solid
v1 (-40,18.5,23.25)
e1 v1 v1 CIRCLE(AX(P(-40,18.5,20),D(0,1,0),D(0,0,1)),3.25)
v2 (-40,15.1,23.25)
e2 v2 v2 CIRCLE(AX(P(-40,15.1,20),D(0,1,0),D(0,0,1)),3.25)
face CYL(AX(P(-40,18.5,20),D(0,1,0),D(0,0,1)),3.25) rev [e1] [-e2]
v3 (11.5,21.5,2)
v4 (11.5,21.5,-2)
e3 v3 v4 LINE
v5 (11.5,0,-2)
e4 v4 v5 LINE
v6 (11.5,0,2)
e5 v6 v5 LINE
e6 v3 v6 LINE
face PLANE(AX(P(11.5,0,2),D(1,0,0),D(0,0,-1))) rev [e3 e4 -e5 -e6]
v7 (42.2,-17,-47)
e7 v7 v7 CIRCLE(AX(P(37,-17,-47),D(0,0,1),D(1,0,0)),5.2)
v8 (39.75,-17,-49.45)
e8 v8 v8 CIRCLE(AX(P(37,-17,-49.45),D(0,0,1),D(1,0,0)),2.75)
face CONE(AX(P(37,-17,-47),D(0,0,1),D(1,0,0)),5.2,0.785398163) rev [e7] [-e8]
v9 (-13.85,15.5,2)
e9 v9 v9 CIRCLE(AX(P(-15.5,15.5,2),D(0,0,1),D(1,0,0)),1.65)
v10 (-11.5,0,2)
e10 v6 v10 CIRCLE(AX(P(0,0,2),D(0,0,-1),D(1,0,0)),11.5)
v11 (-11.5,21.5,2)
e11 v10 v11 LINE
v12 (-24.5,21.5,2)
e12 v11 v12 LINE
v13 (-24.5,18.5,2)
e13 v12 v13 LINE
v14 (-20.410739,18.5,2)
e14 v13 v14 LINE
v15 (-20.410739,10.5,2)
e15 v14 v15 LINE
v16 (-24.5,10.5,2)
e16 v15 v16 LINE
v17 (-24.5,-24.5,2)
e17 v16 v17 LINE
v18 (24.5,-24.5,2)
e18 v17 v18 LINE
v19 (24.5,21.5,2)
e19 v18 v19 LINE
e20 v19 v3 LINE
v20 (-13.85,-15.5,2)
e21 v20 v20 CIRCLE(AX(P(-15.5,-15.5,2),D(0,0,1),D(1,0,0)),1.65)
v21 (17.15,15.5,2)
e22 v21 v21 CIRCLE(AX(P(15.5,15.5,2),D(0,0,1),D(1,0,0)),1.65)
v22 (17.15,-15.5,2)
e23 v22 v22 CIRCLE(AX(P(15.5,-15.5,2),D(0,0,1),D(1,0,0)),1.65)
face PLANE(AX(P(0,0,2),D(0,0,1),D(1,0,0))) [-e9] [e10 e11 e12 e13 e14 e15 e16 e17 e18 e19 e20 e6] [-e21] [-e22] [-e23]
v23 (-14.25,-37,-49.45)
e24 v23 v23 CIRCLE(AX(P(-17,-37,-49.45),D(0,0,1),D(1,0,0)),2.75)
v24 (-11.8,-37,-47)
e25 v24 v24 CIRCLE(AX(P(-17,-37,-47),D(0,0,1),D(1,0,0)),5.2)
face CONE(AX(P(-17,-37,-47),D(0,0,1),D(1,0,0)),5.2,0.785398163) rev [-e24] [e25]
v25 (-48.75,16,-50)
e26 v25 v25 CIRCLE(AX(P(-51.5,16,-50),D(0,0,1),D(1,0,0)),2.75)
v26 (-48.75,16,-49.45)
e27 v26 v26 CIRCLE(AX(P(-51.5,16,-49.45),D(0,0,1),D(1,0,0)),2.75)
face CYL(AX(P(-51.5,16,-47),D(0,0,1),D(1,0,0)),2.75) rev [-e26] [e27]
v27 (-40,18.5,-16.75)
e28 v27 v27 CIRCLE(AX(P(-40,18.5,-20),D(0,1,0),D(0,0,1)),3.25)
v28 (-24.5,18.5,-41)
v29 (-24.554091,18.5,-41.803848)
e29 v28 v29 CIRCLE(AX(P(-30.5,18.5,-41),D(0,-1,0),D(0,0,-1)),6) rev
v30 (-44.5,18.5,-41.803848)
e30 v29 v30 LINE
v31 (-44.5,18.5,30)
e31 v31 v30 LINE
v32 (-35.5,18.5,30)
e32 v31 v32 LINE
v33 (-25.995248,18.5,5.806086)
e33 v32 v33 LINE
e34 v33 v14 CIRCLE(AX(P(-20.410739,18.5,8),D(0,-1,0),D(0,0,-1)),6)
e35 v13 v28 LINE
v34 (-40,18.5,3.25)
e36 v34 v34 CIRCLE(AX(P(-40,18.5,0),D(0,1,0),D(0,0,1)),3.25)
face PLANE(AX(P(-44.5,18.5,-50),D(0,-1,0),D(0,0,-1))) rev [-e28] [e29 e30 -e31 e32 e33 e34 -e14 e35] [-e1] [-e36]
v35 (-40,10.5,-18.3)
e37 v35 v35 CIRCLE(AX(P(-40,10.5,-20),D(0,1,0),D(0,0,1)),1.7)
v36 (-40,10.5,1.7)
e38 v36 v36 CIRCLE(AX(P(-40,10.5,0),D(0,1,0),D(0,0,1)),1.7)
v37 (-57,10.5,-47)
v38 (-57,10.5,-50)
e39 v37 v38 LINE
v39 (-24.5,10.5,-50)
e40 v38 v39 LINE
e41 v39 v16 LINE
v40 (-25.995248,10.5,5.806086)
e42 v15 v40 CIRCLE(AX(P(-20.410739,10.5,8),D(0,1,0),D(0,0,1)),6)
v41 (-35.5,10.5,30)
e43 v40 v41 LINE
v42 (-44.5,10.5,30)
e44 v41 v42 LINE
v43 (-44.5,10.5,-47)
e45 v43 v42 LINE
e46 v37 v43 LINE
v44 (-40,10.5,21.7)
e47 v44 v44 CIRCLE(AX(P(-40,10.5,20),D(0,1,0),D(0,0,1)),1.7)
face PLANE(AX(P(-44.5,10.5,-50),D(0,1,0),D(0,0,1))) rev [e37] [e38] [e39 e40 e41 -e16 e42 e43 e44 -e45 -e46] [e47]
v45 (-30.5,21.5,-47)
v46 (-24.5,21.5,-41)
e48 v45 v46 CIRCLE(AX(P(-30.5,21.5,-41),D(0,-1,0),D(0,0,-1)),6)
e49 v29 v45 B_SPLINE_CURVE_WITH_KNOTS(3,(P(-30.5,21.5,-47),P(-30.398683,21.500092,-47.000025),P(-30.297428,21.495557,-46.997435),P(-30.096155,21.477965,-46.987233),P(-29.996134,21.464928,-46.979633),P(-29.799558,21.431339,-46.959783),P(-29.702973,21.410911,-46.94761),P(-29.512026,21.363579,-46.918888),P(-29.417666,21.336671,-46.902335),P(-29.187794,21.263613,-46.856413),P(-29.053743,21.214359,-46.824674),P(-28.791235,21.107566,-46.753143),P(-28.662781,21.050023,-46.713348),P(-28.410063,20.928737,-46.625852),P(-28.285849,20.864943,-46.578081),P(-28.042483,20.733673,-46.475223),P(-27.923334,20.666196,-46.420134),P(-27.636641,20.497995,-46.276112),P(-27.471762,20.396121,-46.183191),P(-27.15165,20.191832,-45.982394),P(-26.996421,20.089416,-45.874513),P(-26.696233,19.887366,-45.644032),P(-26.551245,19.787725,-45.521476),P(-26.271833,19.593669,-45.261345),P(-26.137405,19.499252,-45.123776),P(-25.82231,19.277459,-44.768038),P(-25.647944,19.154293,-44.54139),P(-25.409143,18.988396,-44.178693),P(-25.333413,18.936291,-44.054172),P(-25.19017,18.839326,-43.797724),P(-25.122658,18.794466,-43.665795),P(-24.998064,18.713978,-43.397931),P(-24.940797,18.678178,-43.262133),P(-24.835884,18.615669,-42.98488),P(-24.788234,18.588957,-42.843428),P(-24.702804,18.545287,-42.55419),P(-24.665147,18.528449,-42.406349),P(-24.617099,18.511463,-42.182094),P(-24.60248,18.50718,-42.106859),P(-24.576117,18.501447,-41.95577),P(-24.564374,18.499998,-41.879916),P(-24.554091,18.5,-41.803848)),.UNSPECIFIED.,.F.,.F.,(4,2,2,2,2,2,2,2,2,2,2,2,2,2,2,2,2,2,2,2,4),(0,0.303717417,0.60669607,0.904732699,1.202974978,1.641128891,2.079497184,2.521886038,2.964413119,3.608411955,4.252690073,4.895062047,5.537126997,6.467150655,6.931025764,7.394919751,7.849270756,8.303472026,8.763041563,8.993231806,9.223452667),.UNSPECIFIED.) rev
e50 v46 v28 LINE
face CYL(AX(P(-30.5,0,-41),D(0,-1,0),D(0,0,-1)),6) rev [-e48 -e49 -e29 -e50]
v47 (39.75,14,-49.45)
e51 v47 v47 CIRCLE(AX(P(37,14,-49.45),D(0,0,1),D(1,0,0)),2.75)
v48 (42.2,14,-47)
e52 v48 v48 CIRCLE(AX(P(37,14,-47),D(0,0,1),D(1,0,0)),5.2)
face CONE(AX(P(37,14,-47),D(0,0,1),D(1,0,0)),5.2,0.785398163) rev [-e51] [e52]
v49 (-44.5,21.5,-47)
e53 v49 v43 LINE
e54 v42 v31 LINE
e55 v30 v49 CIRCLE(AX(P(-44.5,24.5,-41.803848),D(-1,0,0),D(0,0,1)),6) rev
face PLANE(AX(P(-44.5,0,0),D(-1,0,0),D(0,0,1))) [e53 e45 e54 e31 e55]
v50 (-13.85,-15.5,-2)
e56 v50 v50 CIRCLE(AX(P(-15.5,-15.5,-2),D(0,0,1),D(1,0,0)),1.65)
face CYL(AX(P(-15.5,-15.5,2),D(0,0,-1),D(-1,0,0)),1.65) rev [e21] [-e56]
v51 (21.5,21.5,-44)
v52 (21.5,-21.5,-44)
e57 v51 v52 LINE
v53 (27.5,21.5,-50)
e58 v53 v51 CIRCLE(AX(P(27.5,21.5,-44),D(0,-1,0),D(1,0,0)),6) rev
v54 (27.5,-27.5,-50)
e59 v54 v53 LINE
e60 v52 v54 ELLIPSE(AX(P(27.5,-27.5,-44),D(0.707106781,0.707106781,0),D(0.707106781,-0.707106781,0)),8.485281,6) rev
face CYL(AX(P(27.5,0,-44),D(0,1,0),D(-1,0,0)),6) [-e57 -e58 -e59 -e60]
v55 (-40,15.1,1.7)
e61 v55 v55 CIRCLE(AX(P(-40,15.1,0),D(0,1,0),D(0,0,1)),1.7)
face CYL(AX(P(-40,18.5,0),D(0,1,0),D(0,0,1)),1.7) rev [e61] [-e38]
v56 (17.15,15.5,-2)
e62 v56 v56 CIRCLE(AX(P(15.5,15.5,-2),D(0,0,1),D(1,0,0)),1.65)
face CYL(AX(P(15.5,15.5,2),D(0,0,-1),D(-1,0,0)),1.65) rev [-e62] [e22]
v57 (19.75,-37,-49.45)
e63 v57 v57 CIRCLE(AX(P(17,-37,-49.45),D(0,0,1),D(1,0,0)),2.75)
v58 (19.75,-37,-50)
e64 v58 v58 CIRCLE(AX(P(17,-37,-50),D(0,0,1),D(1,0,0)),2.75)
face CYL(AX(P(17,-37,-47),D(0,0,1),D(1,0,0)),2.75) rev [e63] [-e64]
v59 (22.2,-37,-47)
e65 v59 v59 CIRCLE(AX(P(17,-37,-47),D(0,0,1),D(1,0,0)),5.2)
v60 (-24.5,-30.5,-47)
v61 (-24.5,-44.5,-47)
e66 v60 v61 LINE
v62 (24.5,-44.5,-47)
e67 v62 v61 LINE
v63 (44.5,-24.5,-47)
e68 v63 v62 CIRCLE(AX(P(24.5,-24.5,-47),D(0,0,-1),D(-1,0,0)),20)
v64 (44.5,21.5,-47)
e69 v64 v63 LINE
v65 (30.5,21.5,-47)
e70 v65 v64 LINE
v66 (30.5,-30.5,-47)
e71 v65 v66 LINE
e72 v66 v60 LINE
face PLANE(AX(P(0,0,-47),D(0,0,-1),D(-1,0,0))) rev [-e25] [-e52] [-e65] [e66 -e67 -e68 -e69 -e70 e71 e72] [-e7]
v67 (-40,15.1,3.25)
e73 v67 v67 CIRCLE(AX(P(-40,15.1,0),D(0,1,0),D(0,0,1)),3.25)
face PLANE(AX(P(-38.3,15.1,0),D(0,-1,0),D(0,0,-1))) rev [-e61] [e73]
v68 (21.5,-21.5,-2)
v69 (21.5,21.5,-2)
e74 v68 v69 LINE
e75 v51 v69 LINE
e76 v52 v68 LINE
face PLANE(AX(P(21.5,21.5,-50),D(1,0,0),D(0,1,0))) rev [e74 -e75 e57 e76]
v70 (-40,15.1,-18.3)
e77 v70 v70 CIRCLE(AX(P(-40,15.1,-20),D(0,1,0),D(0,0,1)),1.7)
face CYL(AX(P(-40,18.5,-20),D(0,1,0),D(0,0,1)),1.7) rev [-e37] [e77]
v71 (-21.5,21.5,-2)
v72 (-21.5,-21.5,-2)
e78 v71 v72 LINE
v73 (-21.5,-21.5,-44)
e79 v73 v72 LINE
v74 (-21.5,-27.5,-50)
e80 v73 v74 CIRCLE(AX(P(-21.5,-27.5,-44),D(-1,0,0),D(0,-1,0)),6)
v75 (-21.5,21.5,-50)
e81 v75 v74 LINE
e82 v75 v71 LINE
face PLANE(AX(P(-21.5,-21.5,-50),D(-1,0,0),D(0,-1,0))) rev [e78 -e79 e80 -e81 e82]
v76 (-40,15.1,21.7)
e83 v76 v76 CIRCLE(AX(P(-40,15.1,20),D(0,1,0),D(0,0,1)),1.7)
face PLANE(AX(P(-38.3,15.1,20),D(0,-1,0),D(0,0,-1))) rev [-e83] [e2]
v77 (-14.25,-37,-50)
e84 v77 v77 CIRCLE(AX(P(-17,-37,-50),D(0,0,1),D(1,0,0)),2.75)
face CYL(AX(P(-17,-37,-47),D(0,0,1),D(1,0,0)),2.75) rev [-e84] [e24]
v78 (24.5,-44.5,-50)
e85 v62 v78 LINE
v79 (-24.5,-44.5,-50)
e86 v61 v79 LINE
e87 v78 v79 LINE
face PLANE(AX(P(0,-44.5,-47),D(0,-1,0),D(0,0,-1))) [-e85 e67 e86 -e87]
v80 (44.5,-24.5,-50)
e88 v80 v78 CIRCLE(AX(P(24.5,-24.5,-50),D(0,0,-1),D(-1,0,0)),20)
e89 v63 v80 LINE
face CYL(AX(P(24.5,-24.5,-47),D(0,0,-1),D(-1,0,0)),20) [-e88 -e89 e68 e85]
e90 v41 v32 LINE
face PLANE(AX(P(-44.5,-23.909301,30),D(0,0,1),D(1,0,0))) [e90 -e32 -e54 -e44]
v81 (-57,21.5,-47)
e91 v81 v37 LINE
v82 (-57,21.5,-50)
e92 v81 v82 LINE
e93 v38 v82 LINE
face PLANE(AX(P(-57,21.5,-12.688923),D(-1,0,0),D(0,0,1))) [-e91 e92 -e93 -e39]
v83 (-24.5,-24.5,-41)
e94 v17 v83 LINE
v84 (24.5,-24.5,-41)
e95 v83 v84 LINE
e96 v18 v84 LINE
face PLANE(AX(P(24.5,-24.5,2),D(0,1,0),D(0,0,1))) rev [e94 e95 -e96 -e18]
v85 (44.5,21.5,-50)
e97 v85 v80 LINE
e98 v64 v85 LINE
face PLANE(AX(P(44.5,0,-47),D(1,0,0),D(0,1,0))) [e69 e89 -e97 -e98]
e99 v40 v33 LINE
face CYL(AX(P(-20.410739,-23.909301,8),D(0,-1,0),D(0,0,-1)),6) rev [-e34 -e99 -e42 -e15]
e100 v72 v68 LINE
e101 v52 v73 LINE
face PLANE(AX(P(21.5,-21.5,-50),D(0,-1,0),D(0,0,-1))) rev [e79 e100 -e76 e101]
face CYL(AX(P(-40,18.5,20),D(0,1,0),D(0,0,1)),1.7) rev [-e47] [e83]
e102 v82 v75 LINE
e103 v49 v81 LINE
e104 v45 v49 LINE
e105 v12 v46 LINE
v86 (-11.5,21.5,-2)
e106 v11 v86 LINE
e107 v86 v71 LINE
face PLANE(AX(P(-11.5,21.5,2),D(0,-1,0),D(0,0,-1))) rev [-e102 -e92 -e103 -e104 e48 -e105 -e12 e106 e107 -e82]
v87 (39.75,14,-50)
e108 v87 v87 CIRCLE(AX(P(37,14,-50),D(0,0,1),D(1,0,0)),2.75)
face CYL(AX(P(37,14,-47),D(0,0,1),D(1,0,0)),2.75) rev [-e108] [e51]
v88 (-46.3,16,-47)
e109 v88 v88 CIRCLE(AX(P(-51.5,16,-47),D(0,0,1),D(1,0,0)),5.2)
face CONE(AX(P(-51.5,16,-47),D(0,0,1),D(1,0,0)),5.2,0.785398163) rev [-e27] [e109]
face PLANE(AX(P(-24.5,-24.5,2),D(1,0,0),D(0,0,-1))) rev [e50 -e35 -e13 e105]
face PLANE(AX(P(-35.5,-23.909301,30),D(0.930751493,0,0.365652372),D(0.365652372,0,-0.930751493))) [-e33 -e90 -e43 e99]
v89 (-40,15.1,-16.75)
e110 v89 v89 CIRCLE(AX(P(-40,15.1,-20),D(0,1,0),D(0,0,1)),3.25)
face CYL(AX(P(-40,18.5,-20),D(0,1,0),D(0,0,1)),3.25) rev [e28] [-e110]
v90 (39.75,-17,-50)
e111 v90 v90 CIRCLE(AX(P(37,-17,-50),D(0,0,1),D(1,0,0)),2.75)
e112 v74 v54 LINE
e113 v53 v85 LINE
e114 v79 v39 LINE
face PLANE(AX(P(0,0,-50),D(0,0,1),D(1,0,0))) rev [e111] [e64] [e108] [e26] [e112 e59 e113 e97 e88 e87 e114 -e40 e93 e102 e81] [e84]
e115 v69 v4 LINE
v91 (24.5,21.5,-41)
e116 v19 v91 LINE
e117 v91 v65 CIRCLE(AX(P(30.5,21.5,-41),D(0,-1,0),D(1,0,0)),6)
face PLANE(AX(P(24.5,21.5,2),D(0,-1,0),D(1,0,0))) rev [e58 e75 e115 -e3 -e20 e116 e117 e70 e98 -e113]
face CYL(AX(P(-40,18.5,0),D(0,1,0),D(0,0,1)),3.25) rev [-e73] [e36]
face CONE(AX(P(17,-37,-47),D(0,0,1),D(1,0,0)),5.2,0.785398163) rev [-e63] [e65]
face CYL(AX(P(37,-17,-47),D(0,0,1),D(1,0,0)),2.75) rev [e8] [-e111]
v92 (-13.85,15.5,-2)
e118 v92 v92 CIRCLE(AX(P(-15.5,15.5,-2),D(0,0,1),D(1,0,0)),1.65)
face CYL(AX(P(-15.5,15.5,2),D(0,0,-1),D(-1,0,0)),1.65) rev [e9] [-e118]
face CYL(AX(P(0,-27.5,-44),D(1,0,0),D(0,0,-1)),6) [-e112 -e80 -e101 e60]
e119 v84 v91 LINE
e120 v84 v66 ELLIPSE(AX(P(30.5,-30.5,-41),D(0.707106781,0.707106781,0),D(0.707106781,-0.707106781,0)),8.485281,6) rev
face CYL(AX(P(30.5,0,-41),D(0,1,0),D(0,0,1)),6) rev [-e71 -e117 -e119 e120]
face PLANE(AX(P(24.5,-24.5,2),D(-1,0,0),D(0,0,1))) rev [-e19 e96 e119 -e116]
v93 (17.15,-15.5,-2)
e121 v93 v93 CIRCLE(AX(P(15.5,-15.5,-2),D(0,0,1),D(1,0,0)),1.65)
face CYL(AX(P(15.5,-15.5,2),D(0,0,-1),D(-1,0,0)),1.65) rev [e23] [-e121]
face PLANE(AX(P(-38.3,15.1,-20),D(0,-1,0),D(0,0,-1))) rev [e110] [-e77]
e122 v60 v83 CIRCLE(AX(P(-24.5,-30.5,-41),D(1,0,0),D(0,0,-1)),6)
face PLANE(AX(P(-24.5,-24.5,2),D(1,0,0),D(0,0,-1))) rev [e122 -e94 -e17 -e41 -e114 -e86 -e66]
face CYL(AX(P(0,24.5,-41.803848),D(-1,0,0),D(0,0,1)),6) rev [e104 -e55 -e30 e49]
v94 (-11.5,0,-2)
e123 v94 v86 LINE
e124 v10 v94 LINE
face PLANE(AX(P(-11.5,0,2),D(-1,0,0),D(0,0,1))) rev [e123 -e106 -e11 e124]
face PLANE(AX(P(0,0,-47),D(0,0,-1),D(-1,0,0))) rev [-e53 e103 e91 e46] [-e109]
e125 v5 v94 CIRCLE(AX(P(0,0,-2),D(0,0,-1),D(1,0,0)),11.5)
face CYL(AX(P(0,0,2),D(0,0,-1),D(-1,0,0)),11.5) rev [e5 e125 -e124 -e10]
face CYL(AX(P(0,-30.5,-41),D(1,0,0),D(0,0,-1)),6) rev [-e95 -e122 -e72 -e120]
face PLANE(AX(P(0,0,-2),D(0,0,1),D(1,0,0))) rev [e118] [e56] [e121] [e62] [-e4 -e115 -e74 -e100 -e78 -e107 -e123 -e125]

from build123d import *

# Parameters (mm, degrees)
ESQUISSE1_R                                       = 1.65
BOSS_EXTRU_1_DEPTH                                = 2
BOSS_EXTRU_2_DEPTH                                = 48
BOSS_EXTRU_3_DEPTH                                = 3
CONG_1_R                                          = 6
ESQUISSE6_W                                       = 52
ESQUISSE6_H                                       = 8
BOSS_EXTRU_4_DEPTH                                = 20
BOSS_EXTRU_5_DEPTH                                = 8
ESQUISSE8_W                                       = 32.5
ESQUISSE8_H                                       = 11
BOSS_EXTRU_7_DEPTH                                = 3
FRAISAGE_POUR_VIS_T_TE_FRAIS_E_M51_AT_COUNT       = 2
FRAISAGE_POUR_VIS_T_TE_FRAIS_E_M51_AT_PITCH       = 57.584720196
FRAISAGE_POUR_VIS_T_TE_FRAIS_E_M51_2_COUNT        = 2
FRAISAGE_POUR_VIS_T_TE_FRAIS_E_M51_2_PITCH        = 74.276510419
FRAISAGE_POUR_VIS_T_TE_FRAIS_E_M51_3_COUNT        = 2
FRAISAGE_POUR_VIS_T_TE_FRAIS_E_M51_3_PITCH        = 34
FRAISAGE_POUR_VIS_T_TE_FRAIS_E_M51_4_COUNT        = 2
FRAISAGE_POUR_VIS_T_TE_FRAIS_E_M51_4_PITCH        = 63.239623655
CONG_3_R                                          = 6
CONG_4_R                                          = 6
CHAMBRAGE_POUR_VIS_SIX_PANS_CREUX_M31_D           = 3.4
CHAMBRAGE_POUR_VIS_SIX_PANS_CREUX_M31_CBORE_D     = 6.5
CHAMBRAGE_POUR_VIS_SIX_PANS_CREUX_M31_CBORE_DEPTH = 3.4


with BuildPart() as part:
    # Esquisse1 → Boss.-Extru.1 (new, symmetric)
    with BuildSketch(Plane.XY):
        with BuildLine():
            Line((-11.5, 0), (-11.5, 21.5))
            Line((-11.5, 21.5), (-24.5, 21.5))
            Line((-24.5, 21.5), (-24.5, -24.5))
            Line((-24.5, -24.5), (24.5, -24.5))
            Line((24.5, -24.5), (24.5, 21.5))
            Line((24.5, 21.5), (11.5, 21.5))
            Line((11.5, 21.5), (11.5, 0))
            ThreePointArc((11.5, 0), (0, -11.5), (-11.5, 0))
        make_face()
        with Locations((-15.5, 15.5)):
            Circle(ESQUISSE1_R, mode=Mode.SUBTRACT)
        with Locations((15.5, 15.5)):
            Circle(ESQUISSE1_R, mode=Mode.SUBTRACT)
        with Locations((15.5, -15.5)):
            Circle(ESQUISSE1_R, mode=Mode.SUBTRACT)
        with Locations((-15.5, -15.5)):
            Circle(ESQUISSE1_R, mode=Mode.SUBTRACT)
    extrude(amount=BOSS_EXTRU_1_DEPTH, both=True)

    # Esquisse2 → Boss.-Extru.2 (add)
    with BuildSketch(Plane(origin=(0, 0, -2), x_dir=(-1, 0, 0), z_dir=(0, 0, -1))):
        Polygon((-24.5, 21.5), (-21.5, 21.5), (-21.5, -21.5), (21.5, -21.5), (21.5, 21.5), (24.5, 21.5), (24.5, -24.5), (-24.5, -24.5), align=None)
    extrude(amount=BOSS_EXTRU_2_DEPTH)

    # Esquisse4 → Boss.-Extru.3 (add)
    with BuildSketch(Plane(origin=(0, 0, -50), x_dir=(-1, 0, 0), z_dir=(0, 0, -1))):
        with BuildLine():
            Line((-24.5, 21.5), (-44.5, 21.5))
            Line((-44.5, 21.5), (-44.5, -24.5))
            ThreePointArc((-44.5, -24.5), (-38.642135624, -38.642135624), (-24.5, -44.5))
            Line((-24.5, -44.5), (24.5, -44.5))
            Line((24.5, -44.5), (24.5, -24.5))
            Line((24.5, -24.5), (-24.5, -24.5))
            Line((-24.5, -24.5), (-24.5, 21.5))
        make_face()
    extrude(amount=-BOSS_EXTRU_3_DEPTH)

    # Congé1
    cong_1_edges = [part.edges().sort_by_distance(p)[0] for p in [
        (0, -21.5, -50),
        (21.5, 0, -50),
        (24.5, -1.5, -47),
        (0, -24.5, -47),
    ]]
    fillet(cong_1_edges, radius=CONG_1_R)

    # Esquisse6 → Boss.-Extru.4 (add)
    with BuildSketch(Plane.ZY.offset(24.5)):
        with Locations((-24, 14.5)):
            Rectangle(ESQUISSE6_W, ESQUISSE6_H)
    extrude(amount=BOSS_EXTRU_4_DEPTH)

    # Esquisse7 → Boss.-Extru.5 (add)
    with BuildSketch(Plane(origin=(0, 18.5, 0), x_dir=(1, 0, 0), z_dir=(0, 1, 0))):
        Polygon((-44.5, -2), (-44.5, -30), (-35.5, -30), (-24.5, -2), align=None)
    extrude(amount=-BOSS_EXTRU_5_DEPTH)

    # Esquisse8 → Boss.-Extru.7 (add)
    with BuildSketch(Plane(origin=(0, 0, -50), x_dir=(-1, 0, 0), z_dir=(0, 0, -1))):
        with Locations((40.75, 16)):
            Rectangle(ESQUISSE8_W, ESQUISSE8_H)
    extrude(amount=-BOSS_EXTRU_7_DEPTH)

    # Esquisse5 → Fraisage pour vis à tête fraisée M51 (revolve, cut)
    with BuildSketch(Plane(origin=(-17, -37, -47), x_dir=(0, -1, 0), z_dir=(1, 0, 0))):
        Polygon((0, 0), (0, 3), (2.75, 3), (2.75, 2.45), (5.2, 0), align=None)
    fraisage_pour_vis_t_te_frais_e_m51 = revolve(axis=Axis((-17, -37, -40.65), (0, 0, -1)), mode=Mode.SUBTRACT)

    # Fraisage pour vis à tête fraisée M51 at: Fraisage pour vis à tête fraisée M51 ×2
    with Locations(*[Vector(0.9377487607237037, 0.3473143558235938, 0) * (i * FRAISAGE_POUR_VIS_T_TE_FRAIS_E_M51_AT_PITCH) for i in range(1, FRAISAGE_POUR_VIS_T_TE_FRAIS_E_M51_AT_COUNT)]):
        add(fraisage_pour_vis_t_te_frais_e_m51, mode=Mode.SUBTRACT)

    # Fraisage pour vis _ t_te frais_e M51 2: Fraisage pour vis à tête fraisée M51 ×2
    with Locations(*[Vector(0.7270131525498176, 0.6866235329637164, 0) * (i * FRAISAGE_POUR_VIS_T_TE_FRAIS_E_M51_2_PITCH) for i in range(1, FRAISAGE_POUR_VIS_T_TE_FRAIS_E_M51_2_COUNT)]):
        add(fraisage_pour_vis_t_te_frais_e_m51, mode=Mode.SUBTRACT)

    # Fraisage pour vis _ t_te frais_e M51 3: Fraisage pour vis à tête fraisée M51 ×2
    with Locations(*[(i * FRAISAGE_POUR_VIS_T_TE_FRAIS_E_M51_3_PITCH, 0, 0) for i in range(1, FRAISAGE_POUR_VIS_T_TE_FRAIS_E_M51_3_COUNT)]):
        add(fraisage_pour_vis_t_te_frais_e_m51, mode=Mode.SUBTRACT)

    # Fraisage pour vis _ t_te frais_e M51 4: Fraisage pour vis à tête fraisée M51 ×2
    with Locations(*[Vector(-0.5455440435307616, 0.8380821538298656, 0) * (i * FRAISAGE_POUR_VIS_T_TE_FRAIS_E_M51_4_PITCH) for i in range(1, FRAISAGE_POUR_VIS_T_TE_FRAIS_E_M51_4_COUNT)]):
        add(fraisage_pour_vis_t_te_frais_e_m51, mode=Mode.SUBTRACT)

    # Congé3
    # the kernel refuses this fillet: 6 mm, written as the material it adds along each edge
    with BuildSketch(Plane(origin=(-44.5, 18.5, -47), x_dir=(0, 0, 1), z_dir=(1, 0, 0))) as cong_3_piece_1_section:
        with BuildLine():
            CenterArc((5.196152423, -6), CONG_3_R, 90, 60)
            Line((0, -3), (0, 0))
            Line((0, 0), (5.196152423, 0))
        make_face()
    cong_3_piece_1 = extrude(amount=32.990381057, mode=Mode.PRIVATE)
    cong_3_piece_1 = split(cong_3_piece_1, bisect_by=Plane(origin=(-21.5, 18.653513823, -43.204827013), z_dir=(-1, 0, 0)), keep=Keep.TOP, mode=Mode.PRIVATE)
    add(cong_3_piece_1)
    with BuildSketch(Plane(origin=(-24.5, 18.5, -47), x_dir=(0, 0, 1), z_dir=(0, 1, 0))) as cong_3_piece_2:
        with BuildLine():
            CenterArc((CONG_3_R, -CONG_3_R), CONG_3_R, 90, 90)
            Line((0, -CONG_3_R), (0, 0))
            Line((0, 0), (CONG_3_R, 0))
        make_face()
    extrude(amount=3)

    # Congé4
    cong_4_edges = [part.edges().sort_by_distance(p)[0] for p in [
        (-24.5, 14.5, 2),
    ]]
    fillet(cong_4_edges, radius=CONG_4_R)

    # Chambrage pour vis à six pans creux M31 (through all)
    with Locations(Plane(origin=(-40, 18.5, -20), x_dir=(0, 0, 1), z_dir=(0, 1, 0))):
        with Locations((0, 0), (20, 0), (40, 0)):
            CounterBoreHole(CHAMBRAGE_POUR_VIS_SIX_PANS_CREUX_M31_D / 2, CHAMBRAGE_POUR_VIS_SIX_PANS_CREUX_M31_CBORE_D / 2, CHAMBRAGE_POUR_VIS_SIX_PANS_CREUX_M31_CBORE_DEPTH)


solid = part.part
